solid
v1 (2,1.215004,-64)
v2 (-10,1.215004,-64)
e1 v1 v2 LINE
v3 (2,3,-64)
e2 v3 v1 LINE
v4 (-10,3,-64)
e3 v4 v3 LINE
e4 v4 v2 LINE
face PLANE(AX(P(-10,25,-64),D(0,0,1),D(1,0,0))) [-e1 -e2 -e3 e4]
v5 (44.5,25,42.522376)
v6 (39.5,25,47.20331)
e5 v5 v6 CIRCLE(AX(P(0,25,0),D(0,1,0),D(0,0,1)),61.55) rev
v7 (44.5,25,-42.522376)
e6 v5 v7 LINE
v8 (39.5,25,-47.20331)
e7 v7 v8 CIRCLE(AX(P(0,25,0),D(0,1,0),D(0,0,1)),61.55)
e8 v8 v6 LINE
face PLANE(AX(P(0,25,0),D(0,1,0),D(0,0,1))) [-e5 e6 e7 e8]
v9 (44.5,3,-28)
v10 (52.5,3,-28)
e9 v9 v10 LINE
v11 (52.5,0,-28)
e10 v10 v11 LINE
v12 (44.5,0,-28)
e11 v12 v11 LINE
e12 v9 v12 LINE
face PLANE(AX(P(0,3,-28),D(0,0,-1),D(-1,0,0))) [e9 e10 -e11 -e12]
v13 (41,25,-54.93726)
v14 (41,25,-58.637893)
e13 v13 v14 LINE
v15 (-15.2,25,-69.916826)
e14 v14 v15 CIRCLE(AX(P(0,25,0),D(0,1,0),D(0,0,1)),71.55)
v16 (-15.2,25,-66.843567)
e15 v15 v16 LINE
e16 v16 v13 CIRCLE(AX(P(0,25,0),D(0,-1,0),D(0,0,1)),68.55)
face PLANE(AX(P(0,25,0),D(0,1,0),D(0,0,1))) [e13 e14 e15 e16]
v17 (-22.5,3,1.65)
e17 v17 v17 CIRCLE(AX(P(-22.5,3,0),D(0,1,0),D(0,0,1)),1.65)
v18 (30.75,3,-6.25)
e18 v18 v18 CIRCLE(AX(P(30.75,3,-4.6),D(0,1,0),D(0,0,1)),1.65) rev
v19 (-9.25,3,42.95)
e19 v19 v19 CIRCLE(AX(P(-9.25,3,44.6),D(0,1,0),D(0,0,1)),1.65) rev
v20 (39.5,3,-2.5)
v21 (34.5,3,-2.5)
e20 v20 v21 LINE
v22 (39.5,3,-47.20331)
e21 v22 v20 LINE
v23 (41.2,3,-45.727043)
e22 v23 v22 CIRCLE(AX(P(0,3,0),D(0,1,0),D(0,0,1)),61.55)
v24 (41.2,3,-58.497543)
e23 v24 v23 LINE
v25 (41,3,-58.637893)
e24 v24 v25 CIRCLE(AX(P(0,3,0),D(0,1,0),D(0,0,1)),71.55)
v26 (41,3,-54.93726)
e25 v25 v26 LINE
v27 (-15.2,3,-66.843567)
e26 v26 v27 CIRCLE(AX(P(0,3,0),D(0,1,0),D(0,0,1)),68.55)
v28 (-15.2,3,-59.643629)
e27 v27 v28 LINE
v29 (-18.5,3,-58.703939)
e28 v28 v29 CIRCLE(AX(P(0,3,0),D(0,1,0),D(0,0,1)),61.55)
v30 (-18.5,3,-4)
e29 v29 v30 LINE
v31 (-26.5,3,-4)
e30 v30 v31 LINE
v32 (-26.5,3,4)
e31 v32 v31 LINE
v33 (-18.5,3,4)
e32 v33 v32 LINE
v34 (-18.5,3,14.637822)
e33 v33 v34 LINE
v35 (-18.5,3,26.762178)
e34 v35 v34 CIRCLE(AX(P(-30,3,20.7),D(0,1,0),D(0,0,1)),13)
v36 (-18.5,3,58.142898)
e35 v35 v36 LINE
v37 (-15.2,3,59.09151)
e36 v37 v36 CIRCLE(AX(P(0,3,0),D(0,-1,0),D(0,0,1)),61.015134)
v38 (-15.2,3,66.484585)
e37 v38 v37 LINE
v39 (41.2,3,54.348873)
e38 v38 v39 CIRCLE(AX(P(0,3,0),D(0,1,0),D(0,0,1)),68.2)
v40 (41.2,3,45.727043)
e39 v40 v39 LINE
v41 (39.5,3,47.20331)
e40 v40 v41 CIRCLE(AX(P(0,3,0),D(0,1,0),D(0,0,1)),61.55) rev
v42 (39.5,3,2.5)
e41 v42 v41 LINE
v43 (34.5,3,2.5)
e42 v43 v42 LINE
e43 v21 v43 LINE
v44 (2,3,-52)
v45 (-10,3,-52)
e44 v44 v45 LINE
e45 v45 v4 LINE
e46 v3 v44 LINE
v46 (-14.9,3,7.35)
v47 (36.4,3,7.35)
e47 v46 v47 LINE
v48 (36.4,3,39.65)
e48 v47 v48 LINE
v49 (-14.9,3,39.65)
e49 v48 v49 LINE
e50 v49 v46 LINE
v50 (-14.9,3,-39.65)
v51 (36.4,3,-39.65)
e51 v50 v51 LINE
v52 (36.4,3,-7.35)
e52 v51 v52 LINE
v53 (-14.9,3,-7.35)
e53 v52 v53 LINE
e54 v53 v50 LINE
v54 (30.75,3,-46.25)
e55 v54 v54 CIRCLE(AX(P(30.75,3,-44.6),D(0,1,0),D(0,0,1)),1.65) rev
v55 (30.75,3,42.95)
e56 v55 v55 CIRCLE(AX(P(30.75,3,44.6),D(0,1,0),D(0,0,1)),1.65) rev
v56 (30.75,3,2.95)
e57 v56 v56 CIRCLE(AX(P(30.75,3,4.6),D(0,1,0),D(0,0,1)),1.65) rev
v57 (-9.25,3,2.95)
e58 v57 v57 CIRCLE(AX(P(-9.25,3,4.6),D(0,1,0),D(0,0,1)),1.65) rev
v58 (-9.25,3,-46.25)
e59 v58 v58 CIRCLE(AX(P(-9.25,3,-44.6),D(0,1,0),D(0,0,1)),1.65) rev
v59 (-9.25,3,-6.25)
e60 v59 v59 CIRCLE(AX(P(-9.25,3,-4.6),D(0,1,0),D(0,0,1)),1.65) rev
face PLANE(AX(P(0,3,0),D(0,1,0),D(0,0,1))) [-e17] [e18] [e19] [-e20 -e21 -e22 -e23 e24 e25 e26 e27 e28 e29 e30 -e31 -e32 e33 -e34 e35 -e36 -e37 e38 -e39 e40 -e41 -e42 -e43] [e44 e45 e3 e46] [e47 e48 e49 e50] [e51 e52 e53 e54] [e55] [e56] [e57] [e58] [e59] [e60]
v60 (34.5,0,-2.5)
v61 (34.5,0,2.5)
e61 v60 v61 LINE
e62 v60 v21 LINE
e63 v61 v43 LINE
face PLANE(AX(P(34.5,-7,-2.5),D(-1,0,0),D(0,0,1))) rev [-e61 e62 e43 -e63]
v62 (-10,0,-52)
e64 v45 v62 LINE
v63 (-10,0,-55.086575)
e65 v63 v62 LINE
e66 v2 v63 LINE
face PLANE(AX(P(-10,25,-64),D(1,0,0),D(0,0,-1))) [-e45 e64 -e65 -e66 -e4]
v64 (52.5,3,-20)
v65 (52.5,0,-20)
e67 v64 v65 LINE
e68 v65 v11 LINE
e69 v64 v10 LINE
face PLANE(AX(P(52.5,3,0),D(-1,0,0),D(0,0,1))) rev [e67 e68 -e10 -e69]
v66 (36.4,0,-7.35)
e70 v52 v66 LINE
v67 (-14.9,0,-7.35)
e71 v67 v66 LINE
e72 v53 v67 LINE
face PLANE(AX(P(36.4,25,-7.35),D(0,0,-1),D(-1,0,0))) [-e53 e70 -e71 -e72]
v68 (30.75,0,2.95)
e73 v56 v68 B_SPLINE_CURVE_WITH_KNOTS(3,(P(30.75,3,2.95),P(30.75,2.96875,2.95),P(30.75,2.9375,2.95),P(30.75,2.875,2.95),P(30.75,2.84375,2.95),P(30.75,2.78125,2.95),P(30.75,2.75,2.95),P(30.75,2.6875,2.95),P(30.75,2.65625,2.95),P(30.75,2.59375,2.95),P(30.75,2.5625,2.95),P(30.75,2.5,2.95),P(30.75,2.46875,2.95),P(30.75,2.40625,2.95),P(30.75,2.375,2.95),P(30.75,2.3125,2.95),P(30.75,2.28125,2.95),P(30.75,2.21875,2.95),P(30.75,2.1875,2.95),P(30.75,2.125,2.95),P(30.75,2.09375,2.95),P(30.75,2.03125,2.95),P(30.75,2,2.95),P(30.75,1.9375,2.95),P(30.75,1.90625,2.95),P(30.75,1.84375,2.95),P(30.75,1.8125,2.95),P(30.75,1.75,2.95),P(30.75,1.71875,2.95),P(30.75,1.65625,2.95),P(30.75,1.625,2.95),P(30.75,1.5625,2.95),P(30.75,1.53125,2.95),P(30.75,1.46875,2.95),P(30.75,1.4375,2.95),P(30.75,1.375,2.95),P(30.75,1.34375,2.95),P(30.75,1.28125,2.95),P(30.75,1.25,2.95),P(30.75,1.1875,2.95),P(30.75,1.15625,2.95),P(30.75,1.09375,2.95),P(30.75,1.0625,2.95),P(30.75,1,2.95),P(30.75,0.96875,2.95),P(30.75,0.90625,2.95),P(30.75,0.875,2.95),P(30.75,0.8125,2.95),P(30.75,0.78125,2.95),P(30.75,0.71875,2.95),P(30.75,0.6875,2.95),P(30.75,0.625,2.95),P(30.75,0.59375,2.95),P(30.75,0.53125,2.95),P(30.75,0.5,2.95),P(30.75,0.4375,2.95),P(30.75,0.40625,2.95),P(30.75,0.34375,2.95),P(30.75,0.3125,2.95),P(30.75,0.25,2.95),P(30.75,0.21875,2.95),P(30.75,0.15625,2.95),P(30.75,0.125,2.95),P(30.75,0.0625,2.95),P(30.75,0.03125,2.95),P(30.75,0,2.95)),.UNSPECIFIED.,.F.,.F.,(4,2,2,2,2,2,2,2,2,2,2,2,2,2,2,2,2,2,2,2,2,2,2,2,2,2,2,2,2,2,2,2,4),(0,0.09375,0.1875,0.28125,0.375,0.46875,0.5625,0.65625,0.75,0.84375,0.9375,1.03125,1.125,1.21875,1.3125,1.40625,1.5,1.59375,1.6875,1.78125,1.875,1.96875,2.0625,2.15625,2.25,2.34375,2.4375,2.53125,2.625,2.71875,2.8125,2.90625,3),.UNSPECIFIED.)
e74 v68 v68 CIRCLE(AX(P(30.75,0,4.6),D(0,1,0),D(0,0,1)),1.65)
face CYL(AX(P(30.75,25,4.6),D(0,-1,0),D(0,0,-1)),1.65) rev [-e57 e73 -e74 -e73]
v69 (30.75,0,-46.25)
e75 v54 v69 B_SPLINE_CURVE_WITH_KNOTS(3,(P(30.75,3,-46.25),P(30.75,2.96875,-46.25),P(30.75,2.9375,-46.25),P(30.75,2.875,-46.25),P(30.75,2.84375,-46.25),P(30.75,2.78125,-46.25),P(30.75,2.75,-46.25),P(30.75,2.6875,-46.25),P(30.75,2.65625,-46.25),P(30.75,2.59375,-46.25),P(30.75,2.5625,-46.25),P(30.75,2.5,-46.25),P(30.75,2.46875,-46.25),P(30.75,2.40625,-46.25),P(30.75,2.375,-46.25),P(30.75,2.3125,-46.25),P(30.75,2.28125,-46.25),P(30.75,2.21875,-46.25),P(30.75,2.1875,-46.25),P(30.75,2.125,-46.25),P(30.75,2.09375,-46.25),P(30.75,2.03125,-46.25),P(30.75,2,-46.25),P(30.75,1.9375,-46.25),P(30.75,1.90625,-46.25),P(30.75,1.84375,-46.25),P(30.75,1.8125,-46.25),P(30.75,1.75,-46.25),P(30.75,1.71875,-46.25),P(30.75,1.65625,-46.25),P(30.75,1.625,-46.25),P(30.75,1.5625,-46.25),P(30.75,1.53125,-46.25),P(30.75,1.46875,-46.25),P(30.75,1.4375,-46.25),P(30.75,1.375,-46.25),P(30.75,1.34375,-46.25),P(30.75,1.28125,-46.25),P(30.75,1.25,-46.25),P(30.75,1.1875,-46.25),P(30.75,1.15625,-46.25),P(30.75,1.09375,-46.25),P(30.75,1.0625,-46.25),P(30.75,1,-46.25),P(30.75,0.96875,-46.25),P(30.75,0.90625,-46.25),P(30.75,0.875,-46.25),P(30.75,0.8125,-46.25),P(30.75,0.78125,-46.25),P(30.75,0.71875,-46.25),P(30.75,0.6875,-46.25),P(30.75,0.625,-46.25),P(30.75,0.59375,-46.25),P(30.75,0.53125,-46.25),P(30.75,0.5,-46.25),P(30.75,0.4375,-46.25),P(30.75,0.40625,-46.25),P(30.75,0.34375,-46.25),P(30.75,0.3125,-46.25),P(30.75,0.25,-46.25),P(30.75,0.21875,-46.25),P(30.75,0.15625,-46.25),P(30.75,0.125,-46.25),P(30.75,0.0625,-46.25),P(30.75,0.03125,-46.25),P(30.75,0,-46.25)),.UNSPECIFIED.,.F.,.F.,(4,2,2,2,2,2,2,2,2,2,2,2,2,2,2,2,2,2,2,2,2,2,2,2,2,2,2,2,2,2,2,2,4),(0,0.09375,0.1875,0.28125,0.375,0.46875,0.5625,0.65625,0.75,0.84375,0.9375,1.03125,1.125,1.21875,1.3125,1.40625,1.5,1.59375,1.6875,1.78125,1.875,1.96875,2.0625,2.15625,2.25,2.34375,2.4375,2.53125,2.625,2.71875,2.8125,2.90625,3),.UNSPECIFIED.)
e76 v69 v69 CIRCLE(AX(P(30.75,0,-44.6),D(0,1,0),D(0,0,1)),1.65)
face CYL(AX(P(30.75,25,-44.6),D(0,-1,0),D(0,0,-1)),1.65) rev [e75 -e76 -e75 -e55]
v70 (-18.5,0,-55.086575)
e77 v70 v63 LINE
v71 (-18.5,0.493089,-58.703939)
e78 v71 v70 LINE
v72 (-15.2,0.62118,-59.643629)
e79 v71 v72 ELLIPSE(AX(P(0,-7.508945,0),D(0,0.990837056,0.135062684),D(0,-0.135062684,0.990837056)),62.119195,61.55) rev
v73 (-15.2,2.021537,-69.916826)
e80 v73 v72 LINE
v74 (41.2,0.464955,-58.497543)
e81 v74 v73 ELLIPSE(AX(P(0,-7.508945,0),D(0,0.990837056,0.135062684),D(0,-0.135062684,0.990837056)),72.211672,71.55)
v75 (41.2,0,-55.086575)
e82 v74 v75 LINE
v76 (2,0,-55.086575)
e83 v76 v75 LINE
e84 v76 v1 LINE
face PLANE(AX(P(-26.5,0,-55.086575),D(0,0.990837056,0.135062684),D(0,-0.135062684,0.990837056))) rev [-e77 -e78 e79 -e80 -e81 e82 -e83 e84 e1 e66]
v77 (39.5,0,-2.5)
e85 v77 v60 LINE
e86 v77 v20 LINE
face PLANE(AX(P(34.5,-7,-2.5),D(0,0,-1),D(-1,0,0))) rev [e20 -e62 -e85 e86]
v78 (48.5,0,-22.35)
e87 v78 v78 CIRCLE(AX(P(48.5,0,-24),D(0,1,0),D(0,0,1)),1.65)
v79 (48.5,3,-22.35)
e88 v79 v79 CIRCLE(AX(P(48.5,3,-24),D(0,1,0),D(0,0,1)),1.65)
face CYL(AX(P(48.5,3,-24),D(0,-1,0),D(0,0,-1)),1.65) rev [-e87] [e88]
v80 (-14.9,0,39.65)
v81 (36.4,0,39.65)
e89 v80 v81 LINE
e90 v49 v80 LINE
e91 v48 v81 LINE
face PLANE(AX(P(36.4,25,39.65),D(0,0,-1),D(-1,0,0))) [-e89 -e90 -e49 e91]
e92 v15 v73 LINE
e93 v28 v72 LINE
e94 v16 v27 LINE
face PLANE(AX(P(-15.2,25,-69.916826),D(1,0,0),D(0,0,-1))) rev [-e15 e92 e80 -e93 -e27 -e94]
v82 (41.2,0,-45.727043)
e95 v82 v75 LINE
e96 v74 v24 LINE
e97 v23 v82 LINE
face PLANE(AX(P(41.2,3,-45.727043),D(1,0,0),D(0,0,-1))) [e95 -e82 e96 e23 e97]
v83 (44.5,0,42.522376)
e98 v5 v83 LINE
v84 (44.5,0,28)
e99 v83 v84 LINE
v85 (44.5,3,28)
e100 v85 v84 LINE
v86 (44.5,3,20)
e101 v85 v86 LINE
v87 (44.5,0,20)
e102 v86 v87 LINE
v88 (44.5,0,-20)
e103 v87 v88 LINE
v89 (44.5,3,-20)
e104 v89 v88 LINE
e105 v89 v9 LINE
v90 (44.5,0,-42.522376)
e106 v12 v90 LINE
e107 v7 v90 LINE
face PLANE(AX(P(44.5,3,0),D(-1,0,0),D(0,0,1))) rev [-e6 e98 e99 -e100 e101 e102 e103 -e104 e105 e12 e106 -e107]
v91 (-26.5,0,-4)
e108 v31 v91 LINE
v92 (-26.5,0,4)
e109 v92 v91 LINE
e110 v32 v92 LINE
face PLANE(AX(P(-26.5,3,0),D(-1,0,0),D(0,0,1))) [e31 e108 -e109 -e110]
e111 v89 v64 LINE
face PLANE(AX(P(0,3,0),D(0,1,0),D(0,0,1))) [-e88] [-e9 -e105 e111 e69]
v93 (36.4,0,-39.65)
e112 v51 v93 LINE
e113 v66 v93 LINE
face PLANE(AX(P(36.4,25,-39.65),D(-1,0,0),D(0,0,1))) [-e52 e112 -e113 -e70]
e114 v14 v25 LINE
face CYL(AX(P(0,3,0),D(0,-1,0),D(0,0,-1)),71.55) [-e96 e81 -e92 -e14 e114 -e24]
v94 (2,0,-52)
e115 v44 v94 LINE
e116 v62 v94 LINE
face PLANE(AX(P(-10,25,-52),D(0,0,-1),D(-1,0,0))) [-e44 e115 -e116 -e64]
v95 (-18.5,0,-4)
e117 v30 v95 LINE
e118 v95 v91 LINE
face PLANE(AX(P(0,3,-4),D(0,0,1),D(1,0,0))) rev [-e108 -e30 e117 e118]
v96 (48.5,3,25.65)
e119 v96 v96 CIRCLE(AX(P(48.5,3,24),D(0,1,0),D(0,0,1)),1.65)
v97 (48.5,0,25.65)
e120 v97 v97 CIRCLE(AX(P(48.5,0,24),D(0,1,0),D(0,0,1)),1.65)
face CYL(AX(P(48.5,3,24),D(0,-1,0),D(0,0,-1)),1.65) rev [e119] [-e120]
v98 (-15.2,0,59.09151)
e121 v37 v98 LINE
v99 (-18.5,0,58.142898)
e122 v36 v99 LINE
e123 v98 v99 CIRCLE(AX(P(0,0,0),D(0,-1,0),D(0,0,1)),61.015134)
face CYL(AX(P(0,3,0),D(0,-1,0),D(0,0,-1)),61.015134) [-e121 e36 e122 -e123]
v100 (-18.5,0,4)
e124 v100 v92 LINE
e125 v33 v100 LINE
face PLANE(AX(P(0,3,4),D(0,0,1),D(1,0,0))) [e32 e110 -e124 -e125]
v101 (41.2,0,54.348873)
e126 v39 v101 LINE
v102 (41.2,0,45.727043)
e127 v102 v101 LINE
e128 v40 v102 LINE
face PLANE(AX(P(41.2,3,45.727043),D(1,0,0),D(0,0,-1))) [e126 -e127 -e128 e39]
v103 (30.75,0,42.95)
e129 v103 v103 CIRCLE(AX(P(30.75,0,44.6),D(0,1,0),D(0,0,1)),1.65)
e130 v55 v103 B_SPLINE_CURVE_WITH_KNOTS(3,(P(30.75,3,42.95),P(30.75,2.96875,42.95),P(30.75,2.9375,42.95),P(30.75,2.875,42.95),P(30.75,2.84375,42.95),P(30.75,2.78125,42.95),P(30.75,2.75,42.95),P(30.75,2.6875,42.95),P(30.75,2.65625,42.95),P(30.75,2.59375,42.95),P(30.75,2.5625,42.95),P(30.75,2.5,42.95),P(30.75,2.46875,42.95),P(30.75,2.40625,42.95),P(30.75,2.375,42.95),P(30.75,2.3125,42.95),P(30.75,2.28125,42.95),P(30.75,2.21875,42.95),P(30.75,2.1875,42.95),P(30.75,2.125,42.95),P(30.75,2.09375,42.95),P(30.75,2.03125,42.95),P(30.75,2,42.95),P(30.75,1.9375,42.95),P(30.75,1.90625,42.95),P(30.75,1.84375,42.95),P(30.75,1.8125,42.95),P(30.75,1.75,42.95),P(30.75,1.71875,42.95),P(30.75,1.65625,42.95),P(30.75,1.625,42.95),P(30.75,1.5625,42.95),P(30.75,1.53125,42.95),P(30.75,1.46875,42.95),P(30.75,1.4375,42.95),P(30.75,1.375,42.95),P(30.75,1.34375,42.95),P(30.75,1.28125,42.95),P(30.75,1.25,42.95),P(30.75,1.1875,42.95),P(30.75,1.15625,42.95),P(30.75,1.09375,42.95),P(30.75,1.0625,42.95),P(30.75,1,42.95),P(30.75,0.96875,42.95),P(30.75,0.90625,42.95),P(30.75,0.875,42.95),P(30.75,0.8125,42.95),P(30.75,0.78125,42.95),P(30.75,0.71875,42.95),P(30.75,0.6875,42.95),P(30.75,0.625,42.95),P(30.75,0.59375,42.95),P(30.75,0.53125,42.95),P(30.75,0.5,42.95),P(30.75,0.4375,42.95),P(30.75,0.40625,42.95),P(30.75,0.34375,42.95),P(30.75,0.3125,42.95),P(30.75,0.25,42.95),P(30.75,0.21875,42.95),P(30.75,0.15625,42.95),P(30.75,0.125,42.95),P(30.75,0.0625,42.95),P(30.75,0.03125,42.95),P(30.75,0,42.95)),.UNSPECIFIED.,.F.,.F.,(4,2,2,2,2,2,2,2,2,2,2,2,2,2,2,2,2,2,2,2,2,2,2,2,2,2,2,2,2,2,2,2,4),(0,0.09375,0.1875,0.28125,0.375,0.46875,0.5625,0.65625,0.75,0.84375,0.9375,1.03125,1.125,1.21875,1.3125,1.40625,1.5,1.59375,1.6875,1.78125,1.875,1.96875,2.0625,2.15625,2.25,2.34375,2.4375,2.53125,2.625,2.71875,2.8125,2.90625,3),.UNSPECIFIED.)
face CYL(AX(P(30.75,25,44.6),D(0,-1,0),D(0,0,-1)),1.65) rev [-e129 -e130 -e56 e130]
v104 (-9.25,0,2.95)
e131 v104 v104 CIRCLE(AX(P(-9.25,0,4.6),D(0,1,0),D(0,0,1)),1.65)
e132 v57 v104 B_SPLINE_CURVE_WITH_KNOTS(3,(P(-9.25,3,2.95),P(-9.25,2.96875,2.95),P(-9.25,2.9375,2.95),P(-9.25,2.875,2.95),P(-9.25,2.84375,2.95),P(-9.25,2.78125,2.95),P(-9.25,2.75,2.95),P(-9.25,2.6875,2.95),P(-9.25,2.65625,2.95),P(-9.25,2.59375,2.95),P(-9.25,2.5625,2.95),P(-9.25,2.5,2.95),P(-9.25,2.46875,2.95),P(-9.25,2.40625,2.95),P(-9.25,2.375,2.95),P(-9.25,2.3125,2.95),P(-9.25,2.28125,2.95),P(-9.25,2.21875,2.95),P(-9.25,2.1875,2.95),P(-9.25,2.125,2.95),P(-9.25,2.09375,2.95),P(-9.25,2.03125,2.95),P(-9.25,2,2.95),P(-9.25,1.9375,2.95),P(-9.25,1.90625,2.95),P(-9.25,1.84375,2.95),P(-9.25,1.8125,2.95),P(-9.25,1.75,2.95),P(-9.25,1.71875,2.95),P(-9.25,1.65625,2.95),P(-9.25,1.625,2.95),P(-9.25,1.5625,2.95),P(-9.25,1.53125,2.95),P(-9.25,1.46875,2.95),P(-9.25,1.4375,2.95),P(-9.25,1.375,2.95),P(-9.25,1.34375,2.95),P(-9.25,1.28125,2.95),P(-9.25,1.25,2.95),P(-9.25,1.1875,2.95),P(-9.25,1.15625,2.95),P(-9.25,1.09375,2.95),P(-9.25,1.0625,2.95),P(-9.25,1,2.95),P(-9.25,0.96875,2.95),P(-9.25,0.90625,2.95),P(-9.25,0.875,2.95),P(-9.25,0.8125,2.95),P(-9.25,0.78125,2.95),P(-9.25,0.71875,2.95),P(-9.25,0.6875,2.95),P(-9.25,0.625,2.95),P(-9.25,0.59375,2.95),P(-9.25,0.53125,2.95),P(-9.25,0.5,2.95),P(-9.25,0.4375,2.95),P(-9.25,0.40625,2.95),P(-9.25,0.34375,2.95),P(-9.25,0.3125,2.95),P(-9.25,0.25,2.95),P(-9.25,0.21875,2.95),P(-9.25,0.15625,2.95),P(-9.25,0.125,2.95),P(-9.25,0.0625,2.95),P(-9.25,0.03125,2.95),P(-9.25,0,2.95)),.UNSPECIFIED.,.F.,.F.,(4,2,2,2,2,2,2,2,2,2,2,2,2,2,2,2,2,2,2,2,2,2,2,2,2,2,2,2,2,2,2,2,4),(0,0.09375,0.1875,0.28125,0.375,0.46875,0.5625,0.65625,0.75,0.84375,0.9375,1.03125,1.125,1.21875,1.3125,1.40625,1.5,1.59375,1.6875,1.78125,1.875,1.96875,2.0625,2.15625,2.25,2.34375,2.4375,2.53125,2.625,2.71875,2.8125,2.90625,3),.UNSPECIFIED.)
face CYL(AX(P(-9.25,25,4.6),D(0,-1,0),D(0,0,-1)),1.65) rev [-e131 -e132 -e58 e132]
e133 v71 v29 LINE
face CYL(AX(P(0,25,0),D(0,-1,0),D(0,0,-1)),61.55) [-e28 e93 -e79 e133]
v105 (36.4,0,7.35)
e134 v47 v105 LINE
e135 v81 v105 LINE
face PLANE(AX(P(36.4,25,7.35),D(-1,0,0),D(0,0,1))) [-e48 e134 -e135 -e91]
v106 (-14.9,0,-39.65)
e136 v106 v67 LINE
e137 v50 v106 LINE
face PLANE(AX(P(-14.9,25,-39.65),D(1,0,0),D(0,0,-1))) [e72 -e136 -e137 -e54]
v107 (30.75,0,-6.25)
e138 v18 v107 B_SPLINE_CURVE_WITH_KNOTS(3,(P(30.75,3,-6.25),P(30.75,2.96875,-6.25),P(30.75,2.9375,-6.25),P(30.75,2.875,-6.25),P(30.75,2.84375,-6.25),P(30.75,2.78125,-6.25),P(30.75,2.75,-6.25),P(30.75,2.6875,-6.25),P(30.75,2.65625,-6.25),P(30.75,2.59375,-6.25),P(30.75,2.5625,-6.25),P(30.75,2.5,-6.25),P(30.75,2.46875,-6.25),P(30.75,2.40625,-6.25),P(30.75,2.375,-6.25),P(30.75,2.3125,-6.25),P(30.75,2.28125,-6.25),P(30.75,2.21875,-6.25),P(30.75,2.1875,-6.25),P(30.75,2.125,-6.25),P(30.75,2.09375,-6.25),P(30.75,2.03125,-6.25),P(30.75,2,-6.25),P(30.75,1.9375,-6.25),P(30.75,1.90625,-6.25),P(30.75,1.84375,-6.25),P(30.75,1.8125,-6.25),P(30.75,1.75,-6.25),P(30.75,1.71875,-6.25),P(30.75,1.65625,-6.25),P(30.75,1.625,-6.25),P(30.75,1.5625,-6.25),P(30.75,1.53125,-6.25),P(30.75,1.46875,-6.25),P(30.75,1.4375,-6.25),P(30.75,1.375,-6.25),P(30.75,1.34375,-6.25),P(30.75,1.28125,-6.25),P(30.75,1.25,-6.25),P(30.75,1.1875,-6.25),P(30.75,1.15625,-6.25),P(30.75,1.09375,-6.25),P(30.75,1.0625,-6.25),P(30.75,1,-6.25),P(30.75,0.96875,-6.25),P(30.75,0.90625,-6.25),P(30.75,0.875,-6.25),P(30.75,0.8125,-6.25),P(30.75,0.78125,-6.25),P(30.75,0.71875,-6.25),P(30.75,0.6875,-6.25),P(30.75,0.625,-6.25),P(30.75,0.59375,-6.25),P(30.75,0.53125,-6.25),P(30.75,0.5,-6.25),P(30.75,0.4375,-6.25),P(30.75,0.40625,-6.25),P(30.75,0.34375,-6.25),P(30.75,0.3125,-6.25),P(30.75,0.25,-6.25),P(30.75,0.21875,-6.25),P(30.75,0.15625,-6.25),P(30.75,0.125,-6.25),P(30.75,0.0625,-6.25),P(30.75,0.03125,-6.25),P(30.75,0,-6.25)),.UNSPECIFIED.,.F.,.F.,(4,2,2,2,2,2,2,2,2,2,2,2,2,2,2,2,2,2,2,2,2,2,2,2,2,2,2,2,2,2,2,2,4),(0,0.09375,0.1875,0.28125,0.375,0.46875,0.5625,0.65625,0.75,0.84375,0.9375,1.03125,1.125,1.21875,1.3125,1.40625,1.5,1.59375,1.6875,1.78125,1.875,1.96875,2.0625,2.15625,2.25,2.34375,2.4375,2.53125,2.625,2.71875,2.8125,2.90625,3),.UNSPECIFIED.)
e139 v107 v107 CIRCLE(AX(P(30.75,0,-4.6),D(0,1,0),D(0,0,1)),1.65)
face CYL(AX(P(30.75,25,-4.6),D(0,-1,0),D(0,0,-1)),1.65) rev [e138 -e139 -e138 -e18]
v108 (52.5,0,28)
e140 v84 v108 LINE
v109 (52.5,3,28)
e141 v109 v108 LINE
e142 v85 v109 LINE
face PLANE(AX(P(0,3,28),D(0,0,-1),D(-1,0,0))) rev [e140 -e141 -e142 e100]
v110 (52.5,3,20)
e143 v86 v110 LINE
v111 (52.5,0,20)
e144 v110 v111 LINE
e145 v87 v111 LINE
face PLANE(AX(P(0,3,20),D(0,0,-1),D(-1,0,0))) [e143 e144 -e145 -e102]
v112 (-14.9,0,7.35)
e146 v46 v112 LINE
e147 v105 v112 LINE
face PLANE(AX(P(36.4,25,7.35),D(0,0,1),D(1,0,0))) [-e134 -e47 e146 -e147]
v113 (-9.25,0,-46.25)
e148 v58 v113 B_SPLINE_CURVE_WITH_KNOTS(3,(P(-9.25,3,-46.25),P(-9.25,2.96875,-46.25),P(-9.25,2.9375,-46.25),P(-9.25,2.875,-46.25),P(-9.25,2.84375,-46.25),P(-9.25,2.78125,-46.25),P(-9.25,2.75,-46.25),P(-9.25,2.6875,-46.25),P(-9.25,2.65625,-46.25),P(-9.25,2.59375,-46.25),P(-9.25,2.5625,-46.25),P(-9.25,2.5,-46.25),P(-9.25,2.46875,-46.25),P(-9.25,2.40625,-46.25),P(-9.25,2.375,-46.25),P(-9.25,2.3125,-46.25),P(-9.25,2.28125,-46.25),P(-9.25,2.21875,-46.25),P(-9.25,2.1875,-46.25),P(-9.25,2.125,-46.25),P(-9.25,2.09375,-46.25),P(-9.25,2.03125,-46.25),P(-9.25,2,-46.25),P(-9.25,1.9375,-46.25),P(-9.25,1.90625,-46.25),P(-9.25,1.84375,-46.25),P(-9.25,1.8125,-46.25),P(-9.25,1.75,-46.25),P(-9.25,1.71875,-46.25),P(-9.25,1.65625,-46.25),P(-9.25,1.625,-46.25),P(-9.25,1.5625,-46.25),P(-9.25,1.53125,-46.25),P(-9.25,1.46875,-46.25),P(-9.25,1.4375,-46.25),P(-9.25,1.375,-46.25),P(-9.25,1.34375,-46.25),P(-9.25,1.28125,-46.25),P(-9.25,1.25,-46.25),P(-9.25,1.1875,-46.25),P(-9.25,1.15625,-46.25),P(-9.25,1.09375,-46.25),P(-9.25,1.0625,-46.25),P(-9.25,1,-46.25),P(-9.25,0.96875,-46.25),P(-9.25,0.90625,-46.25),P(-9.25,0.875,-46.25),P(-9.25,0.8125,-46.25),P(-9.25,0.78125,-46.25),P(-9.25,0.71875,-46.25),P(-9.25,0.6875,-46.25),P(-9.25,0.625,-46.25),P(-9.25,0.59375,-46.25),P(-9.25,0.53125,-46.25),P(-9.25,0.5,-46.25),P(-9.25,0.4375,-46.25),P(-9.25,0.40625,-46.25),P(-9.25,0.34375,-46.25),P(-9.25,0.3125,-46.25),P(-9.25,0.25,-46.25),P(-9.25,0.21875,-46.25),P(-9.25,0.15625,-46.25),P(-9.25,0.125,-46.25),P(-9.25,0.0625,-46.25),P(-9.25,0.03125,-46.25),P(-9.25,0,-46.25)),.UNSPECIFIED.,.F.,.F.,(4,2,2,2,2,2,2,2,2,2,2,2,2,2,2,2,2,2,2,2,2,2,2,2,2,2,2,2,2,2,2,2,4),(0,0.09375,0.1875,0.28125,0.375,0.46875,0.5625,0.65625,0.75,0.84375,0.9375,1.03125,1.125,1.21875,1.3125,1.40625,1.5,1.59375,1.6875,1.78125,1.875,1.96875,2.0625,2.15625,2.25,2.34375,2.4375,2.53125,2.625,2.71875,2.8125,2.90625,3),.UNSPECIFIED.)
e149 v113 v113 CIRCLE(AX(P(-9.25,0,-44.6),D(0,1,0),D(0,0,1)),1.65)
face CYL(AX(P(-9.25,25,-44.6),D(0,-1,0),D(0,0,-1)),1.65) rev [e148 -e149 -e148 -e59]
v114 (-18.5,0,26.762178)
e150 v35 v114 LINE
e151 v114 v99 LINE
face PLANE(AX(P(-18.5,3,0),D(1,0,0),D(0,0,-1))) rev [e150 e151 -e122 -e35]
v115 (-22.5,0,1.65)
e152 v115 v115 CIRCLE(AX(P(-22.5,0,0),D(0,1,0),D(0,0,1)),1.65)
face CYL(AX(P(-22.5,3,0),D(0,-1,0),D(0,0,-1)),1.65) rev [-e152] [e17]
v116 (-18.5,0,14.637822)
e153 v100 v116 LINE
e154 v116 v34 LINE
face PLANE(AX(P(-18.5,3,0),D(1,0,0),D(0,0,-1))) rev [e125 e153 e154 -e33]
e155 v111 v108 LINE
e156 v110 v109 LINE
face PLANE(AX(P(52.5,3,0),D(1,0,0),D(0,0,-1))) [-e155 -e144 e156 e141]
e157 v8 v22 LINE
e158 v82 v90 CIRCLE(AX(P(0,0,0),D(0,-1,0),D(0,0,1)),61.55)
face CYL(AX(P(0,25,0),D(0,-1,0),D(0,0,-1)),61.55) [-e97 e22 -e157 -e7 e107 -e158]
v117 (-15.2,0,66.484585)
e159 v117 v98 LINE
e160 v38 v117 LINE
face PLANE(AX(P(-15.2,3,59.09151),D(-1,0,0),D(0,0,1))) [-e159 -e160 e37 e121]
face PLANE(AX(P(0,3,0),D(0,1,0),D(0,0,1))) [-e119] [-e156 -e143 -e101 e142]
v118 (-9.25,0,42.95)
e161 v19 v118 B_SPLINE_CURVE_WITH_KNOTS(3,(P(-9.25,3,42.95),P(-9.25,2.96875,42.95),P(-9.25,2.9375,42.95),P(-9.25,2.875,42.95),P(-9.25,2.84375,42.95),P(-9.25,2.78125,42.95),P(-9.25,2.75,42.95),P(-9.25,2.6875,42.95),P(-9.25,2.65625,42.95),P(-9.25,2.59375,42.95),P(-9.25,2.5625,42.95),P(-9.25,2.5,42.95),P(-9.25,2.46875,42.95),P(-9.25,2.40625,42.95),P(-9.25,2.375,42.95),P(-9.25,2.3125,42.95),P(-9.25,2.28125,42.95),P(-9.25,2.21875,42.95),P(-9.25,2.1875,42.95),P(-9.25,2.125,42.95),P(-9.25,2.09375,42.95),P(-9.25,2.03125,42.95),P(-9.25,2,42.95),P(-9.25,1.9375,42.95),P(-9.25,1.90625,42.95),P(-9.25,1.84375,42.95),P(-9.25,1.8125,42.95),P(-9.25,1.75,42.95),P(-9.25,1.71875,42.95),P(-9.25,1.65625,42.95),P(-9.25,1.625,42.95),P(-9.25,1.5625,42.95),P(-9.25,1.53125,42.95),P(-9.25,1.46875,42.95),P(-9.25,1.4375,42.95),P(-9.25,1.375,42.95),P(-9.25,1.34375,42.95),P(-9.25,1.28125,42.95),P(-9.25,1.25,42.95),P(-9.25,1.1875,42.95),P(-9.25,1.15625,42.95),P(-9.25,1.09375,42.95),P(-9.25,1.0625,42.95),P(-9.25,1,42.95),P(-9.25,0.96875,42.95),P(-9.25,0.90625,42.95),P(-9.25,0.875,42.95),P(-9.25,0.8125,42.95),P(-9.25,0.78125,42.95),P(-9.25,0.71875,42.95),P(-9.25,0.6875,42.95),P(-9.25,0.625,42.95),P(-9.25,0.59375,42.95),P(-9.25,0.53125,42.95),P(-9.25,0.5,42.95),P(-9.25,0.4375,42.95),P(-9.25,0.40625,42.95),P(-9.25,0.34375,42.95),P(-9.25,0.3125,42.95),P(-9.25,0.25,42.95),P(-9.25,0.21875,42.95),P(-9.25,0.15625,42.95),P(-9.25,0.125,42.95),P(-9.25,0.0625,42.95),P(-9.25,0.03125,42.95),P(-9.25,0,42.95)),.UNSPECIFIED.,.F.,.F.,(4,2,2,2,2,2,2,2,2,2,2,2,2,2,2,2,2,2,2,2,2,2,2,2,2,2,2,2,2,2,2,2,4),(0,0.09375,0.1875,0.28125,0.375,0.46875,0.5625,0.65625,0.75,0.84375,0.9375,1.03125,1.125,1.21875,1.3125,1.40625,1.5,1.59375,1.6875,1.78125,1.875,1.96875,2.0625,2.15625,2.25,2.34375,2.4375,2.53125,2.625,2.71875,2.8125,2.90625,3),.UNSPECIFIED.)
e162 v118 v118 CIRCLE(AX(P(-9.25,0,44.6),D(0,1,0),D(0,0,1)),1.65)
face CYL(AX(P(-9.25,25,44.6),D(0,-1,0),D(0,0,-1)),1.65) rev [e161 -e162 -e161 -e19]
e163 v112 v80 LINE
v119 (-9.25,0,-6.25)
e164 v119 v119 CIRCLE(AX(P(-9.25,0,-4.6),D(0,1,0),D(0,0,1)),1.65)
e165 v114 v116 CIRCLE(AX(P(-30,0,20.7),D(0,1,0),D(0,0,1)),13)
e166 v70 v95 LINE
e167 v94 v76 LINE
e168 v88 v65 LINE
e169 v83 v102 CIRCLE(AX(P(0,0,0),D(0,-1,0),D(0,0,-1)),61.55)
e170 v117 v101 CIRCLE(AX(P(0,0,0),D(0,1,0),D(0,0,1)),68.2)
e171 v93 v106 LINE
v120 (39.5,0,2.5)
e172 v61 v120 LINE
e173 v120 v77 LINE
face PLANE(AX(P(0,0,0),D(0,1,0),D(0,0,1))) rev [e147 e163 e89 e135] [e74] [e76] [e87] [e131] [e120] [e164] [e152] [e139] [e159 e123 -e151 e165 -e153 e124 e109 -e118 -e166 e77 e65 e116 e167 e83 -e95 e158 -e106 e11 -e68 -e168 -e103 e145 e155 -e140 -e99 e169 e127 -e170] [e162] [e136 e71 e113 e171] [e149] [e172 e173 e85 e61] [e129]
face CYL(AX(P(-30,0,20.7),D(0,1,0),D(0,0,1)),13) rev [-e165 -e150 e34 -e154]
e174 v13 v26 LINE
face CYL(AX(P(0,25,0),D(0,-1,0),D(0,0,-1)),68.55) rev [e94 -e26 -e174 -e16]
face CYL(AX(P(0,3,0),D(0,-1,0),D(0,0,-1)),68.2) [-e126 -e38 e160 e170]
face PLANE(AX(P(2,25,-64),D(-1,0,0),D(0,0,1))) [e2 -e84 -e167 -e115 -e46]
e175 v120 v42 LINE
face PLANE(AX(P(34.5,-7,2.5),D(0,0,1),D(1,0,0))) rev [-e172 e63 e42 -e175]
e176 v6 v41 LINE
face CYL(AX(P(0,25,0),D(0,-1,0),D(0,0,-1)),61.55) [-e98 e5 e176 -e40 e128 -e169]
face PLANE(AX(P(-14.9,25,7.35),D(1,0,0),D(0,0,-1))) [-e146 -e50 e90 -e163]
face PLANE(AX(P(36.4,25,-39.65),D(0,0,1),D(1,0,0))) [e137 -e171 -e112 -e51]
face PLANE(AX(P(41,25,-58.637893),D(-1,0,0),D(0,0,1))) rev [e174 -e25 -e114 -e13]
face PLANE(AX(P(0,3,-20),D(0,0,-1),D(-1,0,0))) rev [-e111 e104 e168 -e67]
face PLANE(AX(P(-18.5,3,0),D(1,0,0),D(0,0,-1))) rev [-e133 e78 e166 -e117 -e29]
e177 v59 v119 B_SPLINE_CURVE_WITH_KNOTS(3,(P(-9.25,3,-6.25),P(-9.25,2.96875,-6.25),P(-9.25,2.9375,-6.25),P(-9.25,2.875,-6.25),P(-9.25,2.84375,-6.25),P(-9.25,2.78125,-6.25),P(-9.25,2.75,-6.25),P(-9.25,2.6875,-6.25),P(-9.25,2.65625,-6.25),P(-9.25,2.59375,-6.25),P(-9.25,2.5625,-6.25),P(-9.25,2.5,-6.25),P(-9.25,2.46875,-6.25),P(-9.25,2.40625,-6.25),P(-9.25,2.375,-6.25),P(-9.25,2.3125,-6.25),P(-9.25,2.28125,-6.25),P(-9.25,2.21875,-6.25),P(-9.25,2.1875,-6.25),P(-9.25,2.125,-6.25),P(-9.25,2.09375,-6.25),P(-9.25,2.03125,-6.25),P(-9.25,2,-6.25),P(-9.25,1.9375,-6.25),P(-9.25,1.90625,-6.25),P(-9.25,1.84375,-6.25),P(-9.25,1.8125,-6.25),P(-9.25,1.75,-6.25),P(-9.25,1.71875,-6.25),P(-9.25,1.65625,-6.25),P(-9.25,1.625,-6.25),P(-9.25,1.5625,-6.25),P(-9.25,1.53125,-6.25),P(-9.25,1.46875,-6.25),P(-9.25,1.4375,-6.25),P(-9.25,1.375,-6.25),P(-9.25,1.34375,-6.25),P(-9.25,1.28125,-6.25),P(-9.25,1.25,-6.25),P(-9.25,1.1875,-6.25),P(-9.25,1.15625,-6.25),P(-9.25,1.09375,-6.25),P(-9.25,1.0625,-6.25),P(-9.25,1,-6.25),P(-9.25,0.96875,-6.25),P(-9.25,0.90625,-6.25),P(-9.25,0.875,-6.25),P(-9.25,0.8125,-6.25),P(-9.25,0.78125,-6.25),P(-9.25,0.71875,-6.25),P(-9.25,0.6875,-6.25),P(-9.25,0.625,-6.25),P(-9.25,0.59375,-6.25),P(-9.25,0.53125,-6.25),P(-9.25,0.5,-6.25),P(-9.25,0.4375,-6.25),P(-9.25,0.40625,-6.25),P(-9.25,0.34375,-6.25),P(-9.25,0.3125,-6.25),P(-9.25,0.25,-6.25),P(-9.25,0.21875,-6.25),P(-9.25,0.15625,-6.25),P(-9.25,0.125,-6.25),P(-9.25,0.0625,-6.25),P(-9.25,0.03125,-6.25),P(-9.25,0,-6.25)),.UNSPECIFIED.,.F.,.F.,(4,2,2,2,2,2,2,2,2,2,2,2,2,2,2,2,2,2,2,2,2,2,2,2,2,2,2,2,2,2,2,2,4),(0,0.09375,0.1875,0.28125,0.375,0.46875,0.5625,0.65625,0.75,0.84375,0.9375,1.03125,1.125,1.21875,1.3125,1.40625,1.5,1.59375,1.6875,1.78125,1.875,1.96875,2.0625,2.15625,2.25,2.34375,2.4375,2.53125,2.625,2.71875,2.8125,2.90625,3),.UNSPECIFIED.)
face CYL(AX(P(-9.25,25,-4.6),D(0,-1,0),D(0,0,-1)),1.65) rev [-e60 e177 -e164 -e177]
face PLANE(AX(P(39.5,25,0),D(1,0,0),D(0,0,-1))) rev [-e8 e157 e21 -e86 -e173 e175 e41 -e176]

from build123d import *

# Parameters (mm, degrees)
SKETCH1_W               = 8
SKETCH1_H               = 8
SKETCH1_R               = 1.65
BOSS_EXTRUDE1_DEPTH     = 3
BOSS_EXTRUDE2_DEPTH     = 22
SKETCH3_R               = 13
CUT_EXTRUDE1_DEPTH      = 92.431135288
CUT_EXTRUDE3_DEPTH      = 3
SKETCH6_R               = 1.65
SKETCH6_W               = 51.3
SKETCH6_H               = 32.3
CUT_EXTRUDE4_DEPTH      = 93.198983183
BOSS_EXTRUDE4_DEPTH     = 25
CUT_EXTRUDE5_DEPTH      = 93.198983183
SKETCH10_W              = 12
SKETCH10_H              = 12
CUT_EXTRUDE6_DEPTH      = 93.198983183
SKETCH11_W              = 5
SKETCH11_H              = 5
CUT_EXTRUDE7_DEPTH      = 10
CUT_EXTRUDE8_DEPTH      = 93.198983183
CUT_EXTRUDE8_DEPTH_BACK = 93.198983183


# Read off the part's stored shape, not the designer's step: Cut-Extrude3
with BuildPart() as part:
    # Sketch1 → Boss-Extrude1 (new body)
    # profile 1 of 4: a face of its own
    with BuildSketch(Plane(origin=(0, 0, 0), x_dir=(1, 0, 0), z_dir=(0, 1, 0))):
        with BuildLine():
            Line((-18.5, 69.116947994), (-18.5, 4))
            Line((-18.5, 4), (-18.5, -4))
            Line((-18.5, -4), (-18.5, -65.642897559))
            ThreePointArc((-18.5, -65.642897559), (14.755653403, -66.584613032), (44.5, -51.681621492))
            Line((44.5, -51.681621492), (44.5, -28))
            Line((44.5, -28), (44.5, -20))
            Line((44.5, -20), (44.5, 20))
            Line((44.5, 20), (44.5, 28))
            Line((44.5, 28), (44.5, 55))
            Line((44.5, 55), (44.5, 56.028140251))
            ThreePointArc((44.5, 56.028140251), (14.554354058, 70.054073957), (-18.5, 69.116947994))
        make_face()
    # profile 2 of 4: a face of its own
    with BuildSketch(Plane(origin=(0, 0, 0), x_dir=(1, 0, 0), z_dir=(0, 1, 0))):
        with Locations((-22.5, 0)):
            Rectangle(SKETCH1_W, SKETCH1_H)
        with Locations(Location((-22.5, 0, 0), (0, 0, 270))):
            Circle(SKETCH1_R, mode=Mode.SUBTRACT)
    # profile 3 of 4: a face of its own
    with BuildSketch(Plane(origin=(0, 0, 0), x_dir=(1, 0, 0), z_dir=(0, 1, 0))):
        with Locations((48.5, -24)):
            Rectangle(SKETCH1_W, SKETCH1_H)
        with Locations(Location((48.5, -24, 0), (0, 0, 270))):
            Circle(SKETCH1_R, mode=Mode.SUBTRACT)
    # profile 4 of 4: a face of its own
    with BuildSketch(Plane(origin=(0, 0, 0), x_dir=(1, 0, 0), z_dir=(0, 1, 0))):
        with Locations((48.5, 24)):
            Rectangle(SKETCH1_W, SKETCH1_H)
        with Locations(Location((48.5, 24, 0), (0, 0, 270))):
            Circle(SKETCH1_R, mode=Mode.SUBTRACT)
    extrude(amount=BOSS_EXTRUDE1_DEPTH)

    # Sketch2 → Boss-Extrude2 (add)
    with BuildSketch(Plane(origin=(0, 3, 0), x_dir=(1, 0, 0), z_dir=(0, 1, 0))):
        with BuildLine():
            Line((44.5, -42.522376462), (44.5, 42.522376462))
            ThreePointArc((44.5, 42.522376462), (42.065161183, 44.932446124), (39.5, 47.203310265))
            Line((39.5, 47.203310265), (39.5, -47.203310265))
            ThreePointArc((39.5, -47.203310265), (42.065161183, -44.932446124), (44.5, -42.522376462))
        make_face()
    extrude(amount=BOSS_EXTRUDE2_DEPTH)

    # Sketch3 → Cut-Extrude1 (cut, through all)
    with BuildSketch(Plane(origin=(0, 3, 0), x_dir=(1, 0, 0), z_dir=(0, 1, 0))):
        with Locations((-30, -20.7)):
            Circle(SKETCH3_R)
    extrude(amount=-CUT_EXTRUDE1_DEPTH, mode=Mode.SUBTRACT)

    # Cut-Extrude3 outline → Cut-Extrude3 (cut)
    with BuildSketch(Plane(origin=(0, 0, 0), x_dir=(1, 0, 0), z_dir=(0, 1, 0))):
        with BuildLine():
            Line((44.5, -51.681621492), (44.5, -42.522376462))
            ThreePointArc((44.5, -42.522376462), (42.879948374, -44.155549226), (41.2, -45.727043421))
            Line((41.2, -45.727043421), (41.2, -54.348873033))
            ThreePointArc((41.2, -54.348873033), (42.870748276, -53.040917623), (44.5, -51.681621492))
        make_face()
        with BuildLine():
            ThreePointArc((41.2, 45.727043421), (42.879948374, 44.155549226), (44.5, 42.522376462))
            Line((44.5, 42.522376462), (44.5, 56.028140251))
            ThreePointArc((44.5, 56.028140251), (42.867784957, 57.286608495), (41.2, 58.497542683))
            Line((41.2, 58.497542683), (41.2, 45.727043421))
        make_face()
        with BuildLine():
            ThreePointArc((-18.5, -65.642897559), (-16.85525465, -66.084343007), (-15.2, -66.484584679))
            Line((-15.2, -66.484584679), (-15.2, -59.091509852))
            ThreePointArc((-15.2, -59.091509852), (-16.856674237, -58.640421812), (-18.5, -58.142897559))
            Line((-18.5, -58.142897559), (-18.5, -65.642897559))
        make_face()
    extrude(amount=CUT_EXTRUDE3_DEPTH, mode=Mode.SUBTRACT)

    # Sketch6 → Cut-Extrude4 (cut, through all)
    with BuildSketch(Plane(origin=(0, 0, 0), x_dir=(1, 0, 0), z_dir=(0, 1, 0))):
        with Locations(Location((-9.25, 44.6, 0), (0, 0, 90))):
            Circle(SKETCH6_R)
        with Locations(Location((-9.25, 4.6, 0), (0, 0, 90))):
            Circle(SKETCH6_R)
        with Locations(Location((30.75, 4.6, 0), (0, 0, 90))):
            Circle(SKETCH6_R)
        with Locations(Location((30.75, 44.6, 0), (0, 0, 90))):
            Circle(SKETCH6_R)
        with Locations(Location((-9.25, -4.6, 0), (0, 0, 90))):
            Circle(SKETCH6_R)
        with Locations(Location((30.75, -4.6, 0), (0, 0, 90))):
            Circle(SKETCH6_R)
        with Locations(Location((30.75, -44.6, 0), (0, 0, 90))):
            Circle(SKETCH6_R)
        with Locations(Location((-9.25, -44.6, 0), (0, 0, 90))):
            Circle(SKETCH6_R)
        with Locations((10.75, 23.5)):
            Rectangle(SKETCH6_W, SKETCH6_H)
        with Locations((10.75, -23.5)):
            Rectangle(SKETCH6_W, SKETCH6_H)
    extrude(amount=CUT_EXTRUDE4_DEPTH, mode=Mode.SUBTRACT)

    # Sketch8 → Boss-Extrude4 (add)
    with BuildSketch(Plane(origin=(0, 0, 0), x_dir=(1, 0, 0), z_dir=(0, 1, 0))):
        with BuildLine():
            Line((41, 58.637893039), (41, 54.93725967))
            ThreePointArc((41, 54.93725967), (14.207393879, 67.061557238), (-15.2, 66.843567379))
            Line((-15.2, 66.843567379), (-15.2, 69.916825586))
            ThreePointArc((-15.2, 69.916825586), (14.078834464, 70.151186164), (41, 58.637893039))
        make_face()
    extrude(amount=BOSS_EXTRUDE4_DEPTH)

    # Sketch9 → Cut-Extrude5 (cut, through all)
    with BuildSketch(Plane(origin=(0, 0, 0), x_dir=(1, 0, 0), z_dir=(0, 1, 0))):
        with BuildLine():
            Line((-18.5, 58.703939391), (-18.5, 74.933190401))
            Line((-18.5, 74.933190401), (-15.2, 74.933190401))
            Line((-15.2, 74.933190401), (-15.2, 59.643629165))
            ThreePointArc((-15.2, 59.643629165), (-16.856549297, 59.196784083), (-18.5, 58.703939391))
        make_face()
    extrude(amount=CUT_EXTRUDE5_DEPTH, mode=Mode.SUBTRACT)

    # Sketch10 → Cut-Extrude6 (cut, through all)
    with BuildSketch(Plane(origin=(0, 0, 0), x_dir=(1, 0, 0), z_dir=(0, 1, 0))):
        with Locations((-4, 58)):
            Rectangle(SKETCH10_W, SKETCH10_H)
    extrude(amount=CUT_EXTRUDE6_DEPTH, mode=Mode.SUBTRACT)

    # Sketch11 → Cut-Extrude7 (cut)
    with BuildSketch(Plane(origin=(0, 3, 0), x_dir=(1, 0, 0), z_dir=(0, 1, 0))):
        with Locations((37, 0)):
            Rectangle(SKETCH11_W, SKETCH11_H)
    extrude(amount=-CUT_EXTRUDE7_DEPTH, mode=Mode.SUBTRACT)

    # Sketch13 → Cut-Extrude8 (cut, two sides: drawn at the far end of the back side and taken through both)
    with BuildSketch(Plane(origin=(0, 0, 0), x_dir=(0, 0, -1), z_dir=(1, 0, 0)).offset(-CUT_EXTRUDE8_DEPTH_BACK)):
        Polygon((55.086575096, 0), (71.55, 2.244157451), (71.55, 0), align=None)
    extrude(amount=CUT_EXTRUDE8_DEPTH + CUT_EXTRUDE8_DEPTH_BACK, mode=Mode.SUBTRACT)


solid = part.part
